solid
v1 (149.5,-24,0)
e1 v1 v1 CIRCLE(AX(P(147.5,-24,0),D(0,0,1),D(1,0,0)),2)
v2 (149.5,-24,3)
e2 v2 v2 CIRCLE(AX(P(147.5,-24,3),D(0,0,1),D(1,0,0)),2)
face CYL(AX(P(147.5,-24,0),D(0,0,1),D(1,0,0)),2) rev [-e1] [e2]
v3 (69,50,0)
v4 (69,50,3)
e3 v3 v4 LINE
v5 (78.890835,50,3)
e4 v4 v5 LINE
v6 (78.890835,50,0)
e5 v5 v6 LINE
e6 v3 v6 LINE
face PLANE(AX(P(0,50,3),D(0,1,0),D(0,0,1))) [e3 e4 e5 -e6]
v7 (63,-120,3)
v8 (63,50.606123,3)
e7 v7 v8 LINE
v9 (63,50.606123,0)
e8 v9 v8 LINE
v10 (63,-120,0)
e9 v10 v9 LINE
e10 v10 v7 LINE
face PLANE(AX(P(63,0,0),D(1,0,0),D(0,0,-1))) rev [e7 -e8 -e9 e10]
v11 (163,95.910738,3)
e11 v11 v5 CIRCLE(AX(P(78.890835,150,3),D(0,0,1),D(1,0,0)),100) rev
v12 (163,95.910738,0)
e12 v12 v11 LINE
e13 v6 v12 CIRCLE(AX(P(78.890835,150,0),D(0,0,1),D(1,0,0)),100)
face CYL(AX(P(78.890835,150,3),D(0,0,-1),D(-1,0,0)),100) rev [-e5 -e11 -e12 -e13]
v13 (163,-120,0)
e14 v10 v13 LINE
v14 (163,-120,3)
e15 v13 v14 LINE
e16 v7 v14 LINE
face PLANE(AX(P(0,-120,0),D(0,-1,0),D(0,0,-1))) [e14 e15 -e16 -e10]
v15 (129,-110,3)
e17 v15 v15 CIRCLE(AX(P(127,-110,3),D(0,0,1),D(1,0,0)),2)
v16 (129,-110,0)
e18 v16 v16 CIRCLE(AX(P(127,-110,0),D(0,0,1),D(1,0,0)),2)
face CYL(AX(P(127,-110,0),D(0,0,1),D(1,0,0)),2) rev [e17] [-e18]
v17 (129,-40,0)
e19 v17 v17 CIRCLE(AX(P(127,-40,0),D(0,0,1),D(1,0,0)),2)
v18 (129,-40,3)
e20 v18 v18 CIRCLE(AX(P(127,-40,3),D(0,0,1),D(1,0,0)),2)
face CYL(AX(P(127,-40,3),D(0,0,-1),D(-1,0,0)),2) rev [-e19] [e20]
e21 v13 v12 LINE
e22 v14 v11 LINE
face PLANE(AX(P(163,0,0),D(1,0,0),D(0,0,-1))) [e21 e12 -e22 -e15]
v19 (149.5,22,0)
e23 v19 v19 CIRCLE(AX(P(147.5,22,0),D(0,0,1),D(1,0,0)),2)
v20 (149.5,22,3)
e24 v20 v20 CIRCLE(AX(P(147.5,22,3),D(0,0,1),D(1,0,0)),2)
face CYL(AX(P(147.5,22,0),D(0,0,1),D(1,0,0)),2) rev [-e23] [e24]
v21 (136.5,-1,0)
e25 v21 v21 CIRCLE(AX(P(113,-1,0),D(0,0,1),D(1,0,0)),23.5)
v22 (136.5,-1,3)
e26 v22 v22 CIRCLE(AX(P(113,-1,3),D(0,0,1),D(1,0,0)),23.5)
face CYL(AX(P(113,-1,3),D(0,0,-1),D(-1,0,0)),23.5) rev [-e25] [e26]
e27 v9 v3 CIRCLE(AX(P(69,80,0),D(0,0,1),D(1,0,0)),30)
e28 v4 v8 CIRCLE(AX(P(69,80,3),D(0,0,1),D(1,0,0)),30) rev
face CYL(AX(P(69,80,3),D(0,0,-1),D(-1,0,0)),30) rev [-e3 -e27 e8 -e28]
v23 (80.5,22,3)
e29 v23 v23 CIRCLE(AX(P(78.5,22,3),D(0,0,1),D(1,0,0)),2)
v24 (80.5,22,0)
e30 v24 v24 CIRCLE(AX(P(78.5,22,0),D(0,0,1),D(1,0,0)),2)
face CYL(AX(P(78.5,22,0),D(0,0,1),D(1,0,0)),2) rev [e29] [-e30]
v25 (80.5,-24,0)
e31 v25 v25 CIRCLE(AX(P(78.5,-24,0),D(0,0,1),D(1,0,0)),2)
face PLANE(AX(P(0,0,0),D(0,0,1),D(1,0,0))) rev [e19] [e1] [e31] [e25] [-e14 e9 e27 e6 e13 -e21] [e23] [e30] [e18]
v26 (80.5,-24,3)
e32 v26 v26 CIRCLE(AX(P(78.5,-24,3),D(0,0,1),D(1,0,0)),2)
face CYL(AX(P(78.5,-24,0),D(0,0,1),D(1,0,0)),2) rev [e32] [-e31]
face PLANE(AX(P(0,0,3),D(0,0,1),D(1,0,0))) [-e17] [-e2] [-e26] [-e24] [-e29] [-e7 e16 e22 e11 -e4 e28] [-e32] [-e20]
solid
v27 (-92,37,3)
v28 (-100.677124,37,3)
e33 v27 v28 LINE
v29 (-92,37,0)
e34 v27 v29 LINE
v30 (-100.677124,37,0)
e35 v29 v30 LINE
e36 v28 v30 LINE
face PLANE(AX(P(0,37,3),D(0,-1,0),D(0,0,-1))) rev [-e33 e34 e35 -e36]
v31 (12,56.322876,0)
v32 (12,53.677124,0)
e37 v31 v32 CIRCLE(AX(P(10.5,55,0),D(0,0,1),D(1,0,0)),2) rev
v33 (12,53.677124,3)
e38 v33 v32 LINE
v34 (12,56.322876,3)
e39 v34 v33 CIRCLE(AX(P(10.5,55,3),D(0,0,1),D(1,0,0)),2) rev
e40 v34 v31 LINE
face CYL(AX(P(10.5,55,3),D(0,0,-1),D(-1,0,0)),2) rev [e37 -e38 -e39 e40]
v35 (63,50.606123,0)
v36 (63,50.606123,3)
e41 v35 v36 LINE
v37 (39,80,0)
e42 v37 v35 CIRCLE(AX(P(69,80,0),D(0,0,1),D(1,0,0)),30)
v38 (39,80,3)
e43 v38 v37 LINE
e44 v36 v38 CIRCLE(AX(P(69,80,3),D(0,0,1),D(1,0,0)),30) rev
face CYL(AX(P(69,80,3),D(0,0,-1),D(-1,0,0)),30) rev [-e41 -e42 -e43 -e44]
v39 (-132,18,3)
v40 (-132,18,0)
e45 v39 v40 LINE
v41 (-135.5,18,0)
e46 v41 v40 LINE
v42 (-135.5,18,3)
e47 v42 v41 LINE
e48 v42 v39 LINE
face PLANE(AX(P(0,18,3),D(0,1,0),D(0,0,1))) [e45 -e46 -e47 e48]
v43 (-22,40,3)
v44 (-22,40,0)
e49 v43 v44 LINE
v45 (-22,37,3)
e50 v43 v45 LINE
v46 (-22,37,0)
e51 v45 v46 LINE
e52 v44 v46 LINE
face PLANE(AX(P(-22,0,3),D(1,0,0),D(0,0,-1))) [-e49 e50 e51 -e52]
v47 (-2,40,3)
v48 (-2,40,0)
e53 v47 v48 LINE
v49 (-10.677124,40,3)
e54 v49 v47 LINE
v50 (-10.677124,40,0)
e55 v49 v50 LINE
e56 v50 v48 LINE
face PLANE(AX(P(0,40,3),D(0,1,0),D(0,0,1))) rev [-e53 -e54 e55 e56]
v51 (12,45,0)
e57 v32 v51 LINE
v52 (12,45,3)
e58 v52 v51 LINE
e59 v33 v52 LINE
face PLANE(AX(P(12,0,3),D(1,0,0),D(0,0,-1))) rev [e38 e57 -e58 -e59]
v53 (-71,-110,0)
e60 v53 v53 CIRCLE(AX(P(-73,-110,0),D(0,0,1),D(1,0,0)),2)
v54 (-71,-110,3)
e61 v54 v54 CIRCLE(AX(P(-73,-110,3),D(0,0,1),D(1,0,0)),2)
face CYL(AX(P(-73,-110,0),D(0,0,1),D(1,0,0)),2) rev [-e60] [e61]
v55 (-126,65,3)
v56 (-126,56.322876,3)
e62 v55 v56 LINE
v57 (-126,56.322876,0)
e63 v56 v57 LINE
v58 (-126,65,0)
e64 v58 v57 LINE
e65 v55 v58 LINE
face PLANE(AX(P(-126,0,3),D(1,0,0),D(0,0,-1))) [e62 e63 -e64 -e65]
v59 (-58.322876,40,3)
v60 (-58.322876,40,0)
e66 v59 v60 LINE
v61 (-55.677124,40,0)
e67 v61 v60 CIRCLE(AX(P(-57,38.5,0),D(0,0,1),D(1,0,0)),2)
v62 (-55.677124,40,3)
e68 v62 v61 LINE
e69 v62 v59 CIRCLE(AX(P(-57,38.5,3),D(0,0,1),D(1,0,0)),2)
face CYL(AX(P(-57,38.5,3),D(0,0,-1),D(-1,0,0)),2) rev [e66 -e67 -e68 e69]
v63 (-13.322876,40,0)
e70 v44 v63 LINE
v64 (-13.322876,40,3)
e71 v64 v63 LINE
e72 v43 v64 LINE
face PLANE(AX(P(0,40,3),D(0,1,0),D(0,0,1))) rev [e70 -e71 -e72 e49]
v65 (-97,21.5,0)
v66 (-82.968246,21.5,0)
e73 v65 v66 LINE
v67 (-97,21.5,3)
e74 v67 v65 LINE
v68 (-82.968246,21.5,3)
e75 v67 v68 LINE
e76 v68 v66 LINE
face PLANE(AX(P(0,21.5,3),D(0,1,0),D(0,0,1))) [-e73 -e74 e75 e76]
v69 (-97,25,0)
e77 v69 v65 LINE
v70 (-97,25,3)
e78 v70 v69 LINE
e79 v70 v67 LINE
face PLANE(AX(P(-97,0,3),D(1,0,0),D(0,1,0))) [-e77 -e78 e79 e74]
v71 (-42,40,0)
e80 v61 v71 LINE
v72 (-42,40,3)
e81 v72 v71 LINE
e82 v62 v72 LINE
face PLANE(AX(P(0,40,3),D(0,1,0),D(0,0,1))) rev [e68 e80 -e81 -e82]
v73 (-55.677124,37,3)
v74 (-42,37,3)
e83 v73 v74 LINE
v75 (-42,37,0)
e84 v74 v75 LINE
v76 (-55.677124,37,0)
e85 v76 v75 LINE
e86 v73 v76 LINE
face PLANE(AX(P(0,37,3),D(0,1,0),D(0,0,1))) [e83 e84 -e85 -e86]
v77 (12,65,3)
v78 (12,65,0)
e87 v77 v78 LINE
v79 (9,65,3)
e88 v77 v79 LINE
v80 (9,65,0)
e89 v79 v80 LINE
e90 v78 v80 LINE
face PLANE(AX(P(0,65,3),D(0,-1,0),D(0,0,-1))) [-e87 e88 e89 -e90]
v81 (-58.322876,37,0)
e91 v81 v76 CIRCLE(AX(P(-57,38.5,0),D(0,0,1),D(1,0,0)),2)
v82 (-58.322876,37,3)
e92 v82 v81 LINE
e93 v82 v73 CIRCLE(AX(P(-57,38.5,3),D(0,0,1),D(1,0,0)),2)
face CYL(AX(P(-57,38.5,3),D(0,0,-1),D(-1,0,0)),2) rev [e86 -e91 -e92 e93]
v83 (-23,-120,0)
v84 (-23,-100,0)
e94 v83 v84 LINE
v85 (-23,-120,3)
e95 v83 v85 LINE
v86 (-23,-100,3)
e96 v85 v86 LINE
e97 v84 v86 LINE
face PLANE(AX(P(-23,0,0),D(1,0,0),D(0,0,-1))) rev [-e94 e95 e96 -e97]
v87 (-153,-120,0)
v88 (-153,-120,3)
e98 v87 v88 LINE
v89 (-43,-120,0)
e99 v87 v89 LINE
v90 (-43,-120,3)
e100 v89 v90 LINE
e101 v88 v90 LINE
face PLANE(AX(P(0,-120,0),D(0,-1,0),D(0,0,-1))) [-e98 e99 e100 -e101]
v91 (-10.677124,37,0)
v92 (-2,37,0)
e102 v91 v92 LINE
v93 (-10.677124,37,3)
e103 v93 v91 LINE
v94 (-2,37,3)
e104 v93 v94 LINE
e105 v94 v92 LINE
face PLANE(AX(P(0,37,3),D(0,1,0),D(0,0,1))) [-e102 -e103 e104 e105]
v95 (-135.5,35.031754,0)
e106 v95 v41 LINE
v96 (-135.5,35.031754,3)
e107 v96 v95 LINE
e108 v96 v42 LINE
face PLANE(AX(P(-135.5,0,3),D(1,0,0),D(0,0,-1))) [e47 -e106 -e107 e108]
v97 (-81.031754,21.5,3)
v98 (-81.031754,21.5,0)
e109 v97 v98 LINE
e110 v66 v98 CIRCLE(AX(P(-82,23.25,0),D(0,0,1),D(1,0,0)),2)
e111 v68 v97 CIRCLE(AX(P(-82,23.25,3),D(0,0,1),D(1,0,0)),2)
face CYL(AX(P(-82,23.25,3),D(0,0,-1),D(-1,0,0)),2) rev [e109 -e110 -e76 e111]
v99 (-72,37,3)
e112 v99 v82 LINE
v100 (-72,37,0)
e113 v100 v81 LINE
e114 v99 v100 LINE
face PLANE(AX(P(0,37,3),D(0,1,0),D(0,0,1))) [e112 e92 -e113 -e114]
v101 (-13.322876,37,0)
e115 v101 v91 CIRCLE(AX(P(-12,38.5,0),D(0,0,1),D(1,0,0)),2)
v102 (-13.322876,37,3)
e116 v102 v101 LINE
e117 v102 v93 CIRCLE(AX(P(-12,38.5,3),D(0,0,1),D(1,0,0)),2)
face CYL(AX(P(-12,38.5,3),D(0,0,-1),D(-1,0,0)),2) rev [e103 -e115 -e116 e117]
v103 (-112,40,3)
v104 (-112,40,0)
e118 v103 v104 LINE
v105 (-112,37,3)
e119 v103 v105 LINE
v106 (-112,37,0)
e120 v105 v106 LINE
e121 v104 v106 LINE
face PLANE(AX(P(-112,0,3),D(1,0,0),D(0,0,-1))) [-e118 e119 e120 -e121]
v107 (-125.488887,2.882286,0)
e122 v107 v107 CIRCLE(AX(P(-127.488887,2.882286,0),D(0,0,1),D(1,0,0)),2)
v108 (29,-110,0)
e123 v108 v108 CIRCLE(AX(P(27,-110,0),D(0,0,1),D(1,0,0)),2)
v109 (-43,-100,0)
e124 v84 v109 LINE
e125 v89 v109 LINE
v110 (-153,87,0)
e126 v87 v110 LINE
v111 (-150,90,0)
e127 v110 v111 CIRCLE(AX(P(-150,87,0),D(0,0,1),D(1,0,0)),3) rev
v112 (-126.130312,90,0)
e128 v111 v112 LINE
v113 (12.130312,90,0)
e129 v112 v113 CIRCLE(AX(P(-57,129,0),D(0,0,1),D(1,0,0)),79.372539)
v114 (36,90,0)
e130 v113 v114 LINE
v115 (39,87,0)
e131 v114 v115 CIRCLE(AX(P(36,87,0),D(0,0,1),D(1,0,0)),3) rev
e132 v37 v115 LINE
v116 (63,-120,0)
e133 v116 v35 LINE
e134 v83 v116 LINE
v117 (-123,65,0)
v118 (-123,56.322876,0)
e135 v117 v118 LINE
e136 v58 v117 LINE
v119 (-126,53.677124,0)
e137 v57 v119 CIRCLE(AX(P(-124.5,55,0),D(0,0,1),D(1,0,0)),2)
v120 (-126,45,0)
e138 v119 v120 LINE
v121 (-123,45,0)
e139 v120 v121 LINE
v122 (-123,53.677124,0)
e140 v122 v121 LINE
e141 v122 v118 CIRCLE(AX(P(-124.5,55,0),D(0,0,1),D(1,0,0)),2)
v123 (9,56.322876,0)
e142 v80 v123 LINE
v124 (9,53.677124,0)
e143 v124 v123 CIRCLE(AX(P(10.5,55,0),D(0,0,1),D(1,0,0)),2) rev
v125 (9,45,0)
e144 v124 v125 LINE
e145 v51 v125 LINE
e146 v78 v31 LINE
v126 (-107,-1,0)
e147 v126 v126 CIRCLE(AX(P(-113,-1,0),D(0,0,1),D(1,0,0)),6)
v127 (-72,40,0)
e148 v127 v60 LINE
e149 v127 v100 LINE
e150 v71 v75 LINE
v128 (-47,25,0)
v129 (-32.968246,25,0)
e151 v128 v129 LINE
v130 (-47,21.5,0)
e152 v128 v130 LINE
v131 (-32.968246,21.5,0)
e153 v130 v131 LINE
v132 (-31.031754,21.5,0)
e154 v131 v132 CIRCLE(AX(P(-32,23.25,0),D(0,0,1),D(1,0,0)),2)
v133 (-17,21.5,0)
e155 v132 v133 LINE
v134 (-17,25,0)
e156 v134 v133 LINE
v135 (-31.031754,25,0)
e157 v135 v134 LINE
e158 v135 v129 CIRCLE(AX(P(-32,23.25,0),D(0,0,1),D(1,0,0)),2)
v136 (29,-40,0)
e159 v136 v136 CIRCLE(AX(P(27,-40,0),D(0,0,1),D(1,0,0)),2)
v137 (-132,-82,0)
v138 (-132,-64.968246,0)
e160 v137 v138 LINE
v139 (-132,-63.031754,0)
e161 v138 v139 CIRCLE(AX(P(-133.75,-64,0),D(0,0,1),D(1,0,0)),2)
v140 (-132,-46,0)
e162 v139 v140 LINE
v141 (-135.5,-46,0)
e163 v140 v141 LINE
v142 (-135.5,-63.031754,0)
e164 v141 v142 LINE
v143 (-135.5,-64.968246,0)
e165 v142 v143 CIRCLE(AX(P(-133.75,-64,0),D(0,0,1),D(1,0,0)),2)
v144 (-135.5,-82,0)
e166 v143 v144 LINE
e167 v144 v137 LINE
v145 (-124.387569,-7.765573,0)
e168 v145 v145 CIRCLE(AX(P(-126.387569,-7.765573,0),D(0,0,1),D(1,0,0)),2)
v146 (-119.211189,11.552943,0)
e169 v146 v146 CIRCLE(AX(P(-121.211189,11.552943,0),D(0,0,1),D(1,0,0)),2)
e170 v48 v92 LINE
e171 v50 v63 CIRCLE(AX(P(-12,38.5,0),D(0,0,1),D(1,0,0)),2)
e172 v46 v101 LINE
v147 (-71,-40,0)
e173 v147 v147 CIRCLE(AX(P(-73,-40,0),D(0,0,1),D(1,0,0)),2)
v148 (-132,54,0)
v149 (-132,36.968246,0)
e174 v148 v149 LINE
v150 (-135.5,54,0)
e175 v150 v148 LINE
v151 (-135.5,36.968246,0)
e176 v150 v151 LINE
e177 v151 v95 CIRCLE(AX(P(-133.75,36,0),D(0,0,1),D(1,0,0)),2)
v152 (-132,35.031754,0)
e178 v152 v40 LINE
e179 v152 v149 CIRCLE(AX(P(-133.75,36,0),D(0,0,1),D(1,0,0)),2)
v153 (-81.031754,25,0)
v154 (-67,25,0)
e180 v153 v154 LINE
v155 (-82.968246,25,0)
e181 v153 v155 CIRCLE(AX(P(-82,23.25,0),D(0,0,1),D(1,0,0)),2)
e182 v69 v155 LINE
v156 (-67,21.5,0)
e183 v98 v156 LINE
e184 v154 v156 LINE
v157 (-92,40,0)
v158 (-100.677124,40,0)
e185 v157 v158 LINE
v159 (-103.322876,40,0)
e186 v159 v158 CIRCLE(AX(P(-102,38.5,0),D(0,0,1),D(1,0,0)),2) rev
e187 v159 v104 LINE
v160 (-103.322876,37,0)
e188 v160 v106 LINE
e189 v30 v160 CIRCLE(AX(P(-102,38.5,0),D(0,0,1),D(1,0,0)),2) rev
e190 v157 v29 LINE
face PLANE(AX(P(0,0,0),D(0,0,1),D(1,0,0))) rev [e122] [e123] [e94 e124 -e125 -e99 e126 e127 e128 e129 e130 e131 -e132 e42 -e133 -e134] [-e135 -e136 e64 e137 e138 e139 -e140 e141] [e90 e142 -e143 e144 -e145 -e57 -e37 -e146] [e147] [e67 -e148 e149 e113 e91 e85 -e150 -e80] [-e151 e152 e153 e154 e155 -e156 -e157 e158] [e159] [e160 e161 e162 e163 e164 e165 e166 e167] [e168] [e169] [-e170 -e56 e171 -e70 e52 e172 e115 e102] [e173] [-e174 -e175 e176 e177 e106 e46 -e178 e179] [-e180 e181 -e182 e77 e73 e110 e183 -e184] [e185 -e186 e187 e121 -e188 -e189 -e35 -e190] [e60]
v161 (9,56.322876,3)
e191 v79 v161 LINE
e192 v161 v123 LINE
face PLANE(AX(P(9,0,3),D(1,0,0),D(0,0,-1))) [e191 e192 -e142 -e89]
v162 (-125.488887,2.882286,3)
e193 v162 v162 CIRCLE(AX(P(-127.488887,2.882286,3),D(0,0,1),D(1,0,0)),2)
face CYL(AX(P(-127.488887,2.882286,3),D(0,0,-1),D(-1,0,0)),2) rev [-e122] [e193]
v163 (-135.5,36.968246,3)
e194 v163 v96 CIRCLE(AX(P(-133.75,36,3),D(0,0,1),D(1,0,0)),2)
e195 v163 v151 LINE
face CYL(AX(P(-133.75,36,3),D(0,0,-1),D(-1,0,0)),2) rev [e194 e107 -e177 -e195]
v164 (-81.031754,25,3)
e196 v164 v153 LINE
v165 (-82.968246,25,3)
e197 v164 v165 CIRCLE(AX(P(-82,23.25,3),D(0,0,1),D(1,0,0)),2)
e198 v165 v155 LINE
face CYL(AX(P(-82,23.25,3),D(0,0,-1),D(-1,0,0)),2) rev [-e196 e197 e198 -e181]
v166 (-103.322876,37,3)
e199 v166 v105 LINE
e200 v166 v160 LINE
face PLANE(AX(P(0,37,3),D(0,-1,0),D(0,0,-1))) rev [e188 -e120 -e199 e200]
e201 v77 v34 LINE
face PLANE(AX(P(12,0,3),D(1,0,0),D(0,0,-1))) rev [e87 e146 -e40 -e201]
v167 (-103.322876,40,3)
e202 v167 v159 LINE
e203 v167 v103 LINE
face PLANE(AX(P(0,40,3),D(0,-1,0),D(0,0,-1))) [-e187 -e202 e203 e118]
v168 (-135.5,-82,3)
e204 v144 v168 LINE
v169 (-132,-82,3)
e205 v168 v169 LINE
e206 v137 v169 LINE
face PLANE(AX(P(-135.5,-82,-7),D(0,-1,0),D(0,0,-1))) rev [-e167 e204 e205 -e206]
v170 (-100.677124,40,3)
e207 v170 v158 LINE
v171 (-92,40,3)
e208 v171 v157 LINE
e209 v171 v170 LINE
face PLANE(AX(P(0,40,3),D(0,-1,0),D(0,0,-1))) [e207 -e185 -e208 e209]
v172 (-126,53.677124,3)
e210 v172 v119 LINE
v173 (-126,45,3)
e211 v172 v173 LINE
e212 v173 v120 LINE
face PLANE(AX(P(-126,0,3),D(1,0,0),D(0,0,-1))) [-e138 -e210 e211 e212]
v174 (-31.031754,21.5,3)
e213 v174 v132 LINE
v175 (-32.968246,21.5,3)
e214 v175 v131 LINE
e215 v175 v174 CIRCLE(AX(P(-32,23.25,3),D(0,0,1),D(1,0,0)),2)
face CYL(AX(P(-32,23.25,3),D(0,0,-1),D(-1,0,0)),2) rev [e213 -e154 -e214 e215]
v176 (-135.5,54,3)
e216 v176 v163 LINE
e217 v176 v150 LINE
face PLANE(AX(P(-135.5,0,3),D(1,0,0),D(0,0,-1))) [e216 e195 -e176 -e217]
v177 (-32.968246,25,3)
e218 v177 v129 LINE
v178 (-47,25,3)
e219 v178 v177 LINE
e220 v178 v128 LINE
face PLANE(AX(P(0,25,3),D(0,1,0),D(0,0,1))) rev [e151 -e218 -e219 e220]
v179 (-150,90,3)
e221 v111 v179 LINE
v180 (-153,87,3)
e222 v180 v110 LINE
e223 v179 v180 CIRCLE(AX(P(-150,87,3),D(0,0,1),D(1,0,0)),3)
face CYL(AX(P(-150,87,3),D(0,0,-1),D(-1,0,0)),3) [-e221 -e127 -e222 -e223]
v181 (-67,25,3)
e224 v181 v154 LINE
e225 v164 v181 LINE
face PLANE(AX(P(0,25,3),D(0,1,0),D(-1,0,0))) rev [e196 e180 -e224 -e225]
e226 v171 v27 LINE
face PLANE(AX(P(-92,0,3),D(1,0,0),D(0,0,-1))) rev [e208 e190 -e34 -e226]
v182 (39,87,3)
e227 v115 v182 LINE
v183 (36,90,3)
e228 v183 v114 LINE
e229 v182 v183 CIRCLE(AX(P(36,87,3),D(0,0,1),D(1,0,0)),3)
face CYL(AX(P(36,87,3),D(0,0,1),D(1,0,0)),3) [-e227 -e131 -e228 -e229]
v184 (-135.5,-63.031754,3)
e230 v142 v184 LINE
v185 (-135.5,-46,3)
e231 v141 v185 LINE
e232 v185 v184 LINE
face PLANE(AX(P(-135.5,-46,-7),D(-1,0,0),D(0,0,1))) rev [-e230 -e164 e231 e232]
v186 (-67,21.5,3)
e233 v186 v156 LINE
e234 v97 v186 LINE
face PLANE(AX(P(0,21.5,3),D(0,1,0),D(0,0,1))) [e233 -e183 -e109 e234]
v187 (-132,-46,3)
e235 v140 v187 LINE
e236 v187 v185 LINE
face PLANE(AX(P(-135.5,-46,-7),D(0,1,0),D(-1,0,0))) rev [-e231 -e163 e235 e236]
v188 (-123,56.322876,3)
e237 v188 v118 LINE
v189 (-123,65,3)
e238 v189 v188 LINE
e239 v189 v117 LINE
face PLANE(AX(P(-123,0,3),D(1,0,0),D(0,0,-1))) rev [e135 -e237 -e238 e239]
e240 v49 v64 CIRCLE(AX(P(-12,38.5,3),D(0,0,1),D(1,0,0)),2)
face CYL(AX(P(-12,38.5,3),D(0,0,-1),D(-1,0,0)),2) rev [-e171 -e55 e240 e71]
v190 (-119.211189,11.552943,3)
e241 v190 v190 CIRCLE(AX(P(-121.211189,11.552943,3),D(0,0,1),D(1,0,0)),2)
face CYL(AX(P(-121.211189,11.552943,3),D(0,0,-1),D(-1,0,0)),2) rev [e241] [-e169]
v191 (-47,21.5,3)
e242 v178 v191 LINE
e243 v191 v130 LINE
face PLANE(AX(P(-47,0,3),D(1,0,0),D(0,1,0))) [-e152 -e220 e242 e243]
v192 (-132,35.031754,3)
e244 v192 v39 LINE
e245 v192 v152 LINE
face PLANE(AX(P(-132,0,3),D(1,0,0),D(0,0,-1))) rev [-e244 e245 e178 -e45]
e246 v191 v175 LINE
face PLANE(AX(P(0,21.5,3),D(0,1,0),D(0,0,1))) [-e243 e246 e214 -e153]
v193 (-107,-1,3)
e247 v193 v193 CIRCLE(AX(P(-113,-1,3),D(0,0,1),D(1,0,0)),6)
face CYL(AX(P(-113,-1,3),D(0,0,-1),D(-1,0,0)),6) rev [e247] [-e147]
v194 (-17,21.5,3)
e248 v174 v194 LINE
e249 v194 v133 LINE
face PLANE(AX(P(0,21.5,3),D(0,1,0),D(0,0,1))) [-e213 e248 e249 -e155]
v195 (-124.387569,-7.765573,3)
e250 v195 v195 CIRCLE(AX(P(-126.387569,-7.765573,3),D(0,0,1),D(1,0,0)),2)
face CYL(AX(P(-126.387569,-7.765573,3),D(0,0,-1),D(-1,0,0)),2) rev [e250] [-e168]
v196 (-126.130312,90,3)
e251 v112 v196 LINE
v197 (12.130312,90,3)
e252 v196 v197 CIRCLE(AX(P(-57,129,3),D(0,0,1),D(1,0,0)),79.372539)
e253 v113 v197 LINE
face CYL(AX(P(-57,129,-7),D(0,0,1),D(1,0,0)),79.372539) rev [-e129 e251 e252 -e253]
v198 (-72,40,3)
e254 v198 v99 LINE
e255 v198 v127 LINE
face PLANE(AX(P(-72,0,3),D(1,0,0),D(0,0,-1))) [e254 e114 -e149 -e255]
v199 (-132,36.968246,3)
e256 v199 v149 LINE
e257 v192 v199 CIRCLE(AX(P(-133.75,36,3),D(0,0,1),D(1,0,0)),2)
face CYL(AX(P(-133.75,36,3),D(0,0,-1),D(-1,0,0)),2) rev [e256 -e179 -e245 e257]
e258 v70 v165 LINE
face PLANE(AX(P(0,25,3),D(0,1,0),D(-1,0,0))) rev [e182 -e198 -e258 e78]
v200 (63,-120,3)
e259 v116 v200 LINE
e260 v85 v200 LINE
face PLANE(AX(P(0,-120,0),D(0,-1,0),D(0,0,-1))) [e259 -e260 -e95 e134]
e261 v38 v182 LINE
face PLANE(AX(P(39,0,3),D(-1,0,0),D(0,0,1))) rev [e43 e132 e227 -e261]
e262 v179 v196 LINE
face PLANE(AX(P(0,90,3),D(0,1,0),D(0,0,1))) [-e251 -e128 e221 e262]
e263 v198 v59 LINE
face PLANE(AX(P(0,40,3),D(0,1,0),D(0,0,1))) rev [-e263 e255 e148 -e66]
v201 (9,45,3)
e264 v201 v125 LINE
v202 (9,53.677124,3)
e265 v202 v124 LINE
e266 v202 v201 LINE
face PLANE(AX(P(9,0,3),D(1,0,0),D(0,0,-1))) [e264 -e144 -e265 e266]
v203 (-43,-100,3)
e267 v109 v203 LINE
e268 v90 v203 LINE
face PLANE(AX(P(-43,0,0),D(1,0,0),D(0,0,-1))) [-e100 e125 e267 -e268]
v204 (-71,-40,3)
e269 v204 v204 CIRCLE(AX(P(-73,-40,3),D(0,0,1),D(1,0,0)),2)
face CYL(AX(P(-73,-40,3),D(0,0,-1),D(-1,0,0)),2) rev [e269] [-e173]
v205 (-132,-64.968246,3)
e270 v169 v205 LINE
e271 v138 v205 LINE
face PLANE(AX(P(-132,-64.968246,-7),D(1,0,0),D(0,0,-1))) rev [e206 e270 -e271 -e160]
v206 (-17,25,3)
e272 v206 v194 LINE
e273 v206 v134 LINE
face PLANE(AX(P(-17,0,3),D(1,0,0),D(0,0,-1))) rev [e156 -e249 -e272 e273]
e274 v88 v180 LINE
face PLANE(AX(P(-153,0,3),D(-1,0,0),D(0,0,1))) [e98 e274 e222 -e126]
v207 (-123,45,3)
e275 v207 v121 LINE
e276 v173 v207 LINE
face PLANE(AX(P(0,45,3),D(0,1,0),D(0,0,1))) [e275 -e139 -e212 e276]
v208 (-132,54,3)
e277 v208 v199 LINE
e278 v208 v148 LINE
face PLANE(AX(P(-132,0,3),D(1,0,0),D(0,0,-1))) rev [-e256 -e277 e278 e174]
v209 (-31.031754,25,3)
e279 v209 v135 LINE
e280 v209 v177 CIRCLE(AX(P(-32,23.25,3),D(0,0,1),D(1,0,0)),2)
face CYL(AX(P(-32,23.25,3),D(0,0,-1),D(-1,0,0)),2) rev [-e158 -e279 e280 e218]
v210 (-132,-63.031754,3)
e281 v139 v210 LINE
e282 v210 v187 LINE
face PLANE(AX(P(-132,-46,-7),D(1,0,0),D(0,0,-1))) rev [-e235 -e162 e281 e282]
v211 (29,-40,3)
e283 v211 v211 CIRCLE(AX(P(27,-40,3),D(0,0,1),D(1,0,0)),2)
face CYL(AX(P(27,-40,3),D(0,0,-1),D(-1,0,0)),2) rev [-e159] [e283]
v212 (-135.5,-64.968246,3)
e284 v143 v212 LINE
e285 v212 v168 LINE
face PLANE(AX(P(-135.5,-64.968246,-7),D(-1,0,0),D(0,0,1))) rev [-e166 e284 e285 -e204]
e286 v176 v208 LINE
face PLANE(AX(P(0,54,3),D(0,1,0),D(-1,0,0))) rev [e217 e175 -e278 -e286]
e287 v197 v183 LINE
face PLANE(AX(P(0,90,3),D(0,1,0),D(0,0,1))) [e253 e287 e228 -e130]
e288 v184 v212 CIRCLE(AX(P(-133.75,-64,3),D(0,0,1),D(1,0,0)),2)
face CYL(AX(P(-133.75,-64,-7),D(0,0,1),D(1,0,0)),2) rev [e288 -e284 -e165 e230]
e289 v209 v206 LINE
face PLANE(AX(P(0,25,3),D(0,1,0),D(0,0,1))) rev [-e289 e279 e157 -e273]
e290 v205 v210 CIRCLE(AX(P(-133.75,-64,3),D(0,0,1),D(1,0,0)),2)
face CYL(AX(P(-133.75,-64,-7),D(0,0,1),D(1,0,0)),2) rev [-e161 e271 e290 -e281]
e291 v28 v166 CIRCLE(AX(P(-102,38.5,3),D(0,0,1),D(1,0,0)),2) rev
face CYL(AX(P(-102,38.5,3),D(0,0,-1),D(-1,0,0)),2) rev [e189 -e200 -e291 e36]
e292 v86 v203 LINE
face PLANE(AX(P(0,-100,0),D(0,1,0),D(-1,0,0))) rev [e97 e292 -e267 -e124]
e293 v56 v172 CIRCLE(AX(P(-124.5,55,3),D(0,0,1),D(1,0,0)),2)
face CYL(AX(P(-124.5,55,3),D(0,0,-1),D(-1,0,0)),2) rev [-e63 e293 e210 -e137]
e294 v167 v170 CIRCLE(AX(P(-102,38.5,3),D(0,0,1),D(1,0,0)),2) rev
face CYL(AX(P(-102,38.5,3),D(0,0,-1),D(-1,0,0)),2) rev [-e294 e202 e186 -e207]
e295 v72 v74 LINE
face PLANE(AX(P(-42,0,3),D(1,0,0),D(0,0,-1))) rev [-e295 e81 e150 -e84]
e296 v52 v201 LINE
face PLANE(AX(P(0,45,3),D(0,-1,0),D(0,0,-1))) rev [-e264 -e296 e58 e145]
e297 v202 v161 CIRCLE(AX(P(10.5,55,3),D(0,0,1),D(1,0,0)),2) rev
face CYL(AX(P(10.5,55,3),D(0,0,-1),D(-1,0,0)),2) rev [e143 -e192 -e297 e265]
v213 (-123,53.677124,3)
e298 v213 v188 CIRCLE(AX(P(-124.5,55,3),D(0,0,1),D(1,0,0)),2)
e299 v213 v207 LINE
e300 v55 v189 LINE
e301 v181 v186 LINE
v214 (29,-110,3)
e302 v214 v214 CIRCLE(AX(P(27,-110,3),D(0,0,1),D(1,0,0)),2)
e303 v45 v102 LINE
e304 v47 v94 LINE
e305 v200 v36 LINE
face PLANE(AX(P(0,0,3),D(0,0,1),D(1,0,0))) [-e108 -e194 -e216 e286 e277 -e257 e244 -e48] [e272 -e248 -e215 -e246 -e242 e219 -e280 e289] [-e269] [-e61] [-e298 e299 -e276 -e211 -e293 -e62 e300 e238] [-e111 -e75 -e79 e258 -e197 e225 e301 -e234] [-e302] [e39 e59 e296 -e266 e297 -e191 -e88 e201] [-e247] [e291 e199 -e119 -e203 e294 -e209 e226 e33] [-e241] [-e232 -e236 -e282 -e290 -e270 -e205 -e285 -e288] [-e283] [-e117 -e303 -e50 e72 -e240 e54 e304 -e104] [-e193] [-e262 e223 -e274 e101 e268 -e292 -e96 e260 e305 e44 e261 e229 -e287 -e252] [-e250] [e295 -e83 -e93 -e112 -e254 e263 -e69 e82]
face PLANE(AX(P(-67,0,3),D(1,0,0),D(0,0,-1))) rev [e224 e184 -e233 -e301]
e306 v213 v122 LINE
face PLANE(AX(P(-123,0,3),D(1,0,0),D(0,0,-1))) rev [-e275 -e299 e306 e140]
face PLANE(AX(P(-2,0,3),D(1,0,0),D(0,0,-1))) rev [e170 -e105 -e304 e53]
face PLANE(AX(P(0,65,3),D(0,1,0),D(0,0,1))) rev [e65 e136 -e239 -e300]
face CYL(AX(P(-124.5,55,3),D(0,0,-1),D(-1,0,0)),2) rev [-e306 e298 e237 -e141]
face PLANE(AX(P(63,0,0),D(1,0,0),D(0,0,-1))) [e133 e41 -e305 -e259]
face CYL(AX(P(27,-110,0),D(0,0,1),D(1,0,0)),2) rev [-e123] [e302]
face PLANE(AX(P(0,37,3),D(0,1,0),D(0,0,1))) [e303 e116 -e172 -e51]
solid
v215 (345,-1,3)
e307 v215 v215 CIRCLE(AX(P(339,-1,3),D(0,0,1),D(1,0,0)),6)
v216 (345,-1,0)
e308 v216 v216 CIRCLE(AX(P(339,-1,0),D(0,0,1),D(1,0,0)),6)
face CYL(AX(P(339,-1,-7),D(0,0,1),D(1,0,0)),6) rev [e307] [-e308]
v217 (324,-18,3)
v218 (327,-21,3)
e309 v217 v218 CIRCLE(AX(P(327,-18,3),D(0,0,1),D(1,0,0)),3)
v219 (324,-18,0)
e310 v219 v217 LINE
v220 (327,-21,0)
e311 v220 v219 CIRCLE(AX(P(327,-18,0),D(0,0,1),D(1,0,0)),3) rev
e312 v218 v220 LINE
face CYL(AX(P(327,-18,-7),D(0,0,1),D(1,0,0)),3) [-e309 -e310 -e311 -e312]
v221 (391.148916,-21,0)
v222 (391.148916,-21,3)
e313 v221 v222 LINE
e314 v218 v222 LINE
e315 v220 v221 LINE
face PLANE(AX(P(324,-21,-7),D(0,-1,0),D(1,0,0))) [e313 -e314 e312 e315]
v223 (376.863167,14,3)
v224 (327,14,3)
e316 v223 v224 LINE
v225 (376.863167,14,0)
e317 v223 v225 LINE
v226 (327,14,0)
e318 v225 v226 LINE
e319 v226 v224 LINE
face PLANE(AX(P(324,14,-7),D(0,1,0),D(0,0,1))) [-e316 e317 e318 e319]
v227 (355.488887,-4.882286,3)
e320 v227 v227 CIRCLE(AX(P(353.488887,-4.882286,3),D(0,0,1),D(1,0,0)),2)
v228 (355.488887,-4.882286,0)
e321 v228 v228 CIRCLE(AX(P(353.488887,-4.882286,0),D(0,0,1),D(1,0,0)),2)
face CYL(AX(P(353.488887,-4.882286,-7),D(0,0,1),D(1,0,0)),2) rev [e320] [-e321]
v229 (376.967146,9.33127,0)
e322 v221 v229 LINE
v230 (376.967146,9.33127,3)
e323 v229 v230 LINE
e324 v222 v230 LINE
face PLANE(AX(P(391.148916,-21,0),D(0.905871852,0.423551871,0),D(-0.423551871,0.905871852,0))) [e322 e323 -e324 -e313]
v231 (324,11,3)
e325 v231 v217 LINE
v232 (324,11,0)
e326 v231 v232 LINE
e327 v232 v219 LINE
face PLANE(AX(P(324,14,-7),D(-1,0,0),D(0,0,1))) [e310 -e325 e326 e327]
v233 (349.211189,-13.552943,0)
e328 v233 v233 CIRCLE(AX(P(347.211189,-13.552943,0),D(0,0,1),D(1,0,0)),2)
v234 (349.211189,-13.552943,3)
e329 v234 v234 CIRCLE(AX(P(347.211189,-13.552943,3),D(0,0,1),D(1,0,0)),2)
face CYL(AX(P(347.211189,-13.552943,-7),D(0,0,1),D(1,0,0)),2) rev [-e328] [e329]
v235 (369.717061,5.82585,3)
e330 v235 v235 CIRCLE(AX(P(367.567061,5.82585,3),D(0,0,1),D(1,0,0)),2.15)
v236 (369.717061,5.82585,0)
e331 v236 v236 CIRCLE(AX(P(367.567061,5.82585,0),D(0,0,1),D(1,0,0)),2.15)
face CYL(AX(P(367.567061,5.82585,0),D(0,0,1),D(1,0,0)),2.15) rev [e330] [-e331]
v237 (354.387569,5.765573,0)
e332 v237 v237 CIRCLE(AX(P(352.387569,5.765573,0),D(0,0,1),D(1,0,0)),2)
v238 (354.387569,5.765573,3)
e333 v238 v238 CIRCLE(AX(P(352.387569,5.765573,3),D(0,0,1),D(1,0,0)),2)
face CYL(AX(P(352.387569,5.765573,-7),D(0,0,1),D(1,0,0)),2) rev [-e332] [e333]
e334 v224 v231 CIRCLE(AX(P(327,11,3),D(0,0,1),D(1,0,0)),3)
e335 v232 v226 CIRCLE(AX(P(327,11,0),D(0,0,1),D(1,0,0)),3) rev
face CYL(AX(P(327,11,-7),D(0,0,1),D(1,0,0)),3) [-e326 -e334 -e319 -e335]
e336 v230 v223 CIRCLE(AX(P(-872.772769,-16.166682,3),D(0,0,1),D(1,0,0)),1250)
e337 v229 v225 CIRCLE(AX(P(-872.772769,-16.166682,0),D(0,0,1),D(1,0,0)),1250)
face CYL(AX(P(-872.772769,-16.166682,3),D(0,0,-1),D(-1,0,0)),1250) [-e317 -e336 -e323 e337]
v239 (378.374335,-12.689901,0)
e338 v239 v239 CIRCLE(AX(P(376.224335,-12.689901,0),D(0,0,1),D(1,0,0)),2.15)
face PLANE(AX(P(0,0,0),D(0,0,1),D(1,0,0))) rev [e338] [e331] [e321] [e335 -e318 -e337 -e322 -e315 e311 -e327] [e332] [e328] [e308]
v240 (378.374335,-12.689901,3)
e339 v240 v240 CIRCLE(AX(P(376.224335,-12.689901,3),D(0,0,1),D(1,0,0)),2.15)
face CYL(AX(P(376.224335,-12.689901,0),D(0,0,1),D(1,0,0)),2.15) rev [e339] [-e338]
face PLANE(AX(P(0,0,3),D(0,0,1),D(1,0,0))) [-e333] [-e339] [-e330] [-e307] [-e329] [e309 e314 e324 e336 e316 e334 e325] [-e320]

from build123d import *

# Parameters (mm, degrees)
SKETCH_1_R                   = 2
SKETCH_1_R_2                 = 6
SKETCH_1_R_3                 = 23.5
EXTRUDE_1_DEPTH              = 3
FILLET_1_R                   = 100
FILLET_2_R                   = 3
CUT_EXTRUDE_1_DEPTH          = 10
FILLET_3_R                   = 30
SKETCH_8_R                   = 2
EXTRUDE_5_DEPTH              = 3
SKETCH_7_R                   = 2
CUT_EXTRUDE_6_DEPTH          = 627.829093668
CUT_EXTRUDE_START            = -10
CUT_EXTRUDE_7_DEPTH          = 10
SPLIT_START                  = 63
SPLIT_BODIES_1_OUTLINE_W     = 622
SPLIT_BODIES_1_OUTLINE_H     = 3
SPLIT_BODIES_1_DEPTH         = 314.227231476
SPLIT_BODIES_1_2_OUTLINE_R   = 2
SPLIT_BODIES_1_2_DEPTH       = 3
SPLIT_BODIES_1_3_OUTLINE_R   = 2
SPLIT_BODIES_1_3_OUTLINE_R_2 = 23.5
SPLIT_BODIES_1_3_DEPTH       = 3
SKETCH_11_W                  = 23
SKETCH_11_H                  = 23
CUT_EXTRUDE_8_DEPTH          = 10
SKETCH_12_R                  = 5.999999999
SKETCH_12_R_2                = 1.999999999
CUT_EXTRUDE_9_DEPTH          = 10
SKETCH_13_R                  = 2
CUT_EXTRUDE_10_DEPTH         = 10
SKETCH_14_R                  = 2
CUT_EXTRUDE_11_DEPTH         = 10
SKETCH_15_OUTSIDE_W          = 695.481
SKETCH_15_OUTSIDE_H          = 785.859
SKETCH_15_OUTSIDE_W_2        = 88.236351933
SKETCH_15_OUTSIDE_H_2        = 35
CUT_EXTRUDE_12_DEPTH         = 10
EXTRUDE_6_DEPTH              = 3
FILLET_4_R                   = 3
SKETCH_17_R                  = 2.15
CUT_EXTRUDE_13_DEPTH         = 3


# Read off the part's stored shape, not the designer's step: 分割1
with BuildPart() as part:
    # 草图1 → 凸台-拉伸1 (new body)
    with BuildSketch(Plane.XY):
        with BuildLine():
            Line((-153, 90), (-153, -50))
            Line((-153, -50), (-43, -50))
            Line((-43, -50), (-43, -30))
            Line((-43, -30), (-23, -30))
            Line((-23, -30), (-23, -50))
            Line((-23, -50), (186, -50))
            Line((186, -50), (186, -27))
            Line((186, -27), (208, -27))
            Line((208, -27), (208, -50))
            Line((208, -50), (377, -50))
            Line((377, -50), (377, -40))
            ThreePointArc((377, -40), (351.416576428, 236.539566066), (265.404312441, 500.604962521))
            Line((265.404312441, 500.604962521), (265.404312441, 285))
            Line((265.404312441, 285), (162.933559346, 285))
            ThreePointArc((162.933559346, 285), (177.824282666, 167.941273759), (181.610438264, 50))
            Line((181.610438264, 50), (39, 50))
            Line((39, 50), (39, 90))
            Line((39, 90), (-153, 90))
        make_face()
        with Locations((-126.387569495, -7.765573369)):
            Circle(SKETCH_1_R, mode=Mode.SUBTRACT)
        with Locations((-127.488887394, 2.882285677)):
            Circle(SKETCH_1_R, mode=Mode.SUBTRACT)
        with Locations((-113, -1)):
            Circle(SKETCH_1_R_2, mode=Mode.SUBTRACT)
        with Locations((-73, -40)):
            Circle(SKETCH_1_R, mode=Mode.SUBTRACT)
        with Locations((-121.211188593, 11.552943156)):
            Circle(SKETCH_1_R, mode=Mode.SUBTRACT)
        with BuildLine():
            Line((-135.5, 36.968245837), (-135.5, 54))
            Line((-135.5, 54), (-132, 54))
            Line((-132, 54), (-132, 36.968245837))
            ThreePointArc((-132, 36.968245837), (-131.75, 36), (-132, 35.031754163))
            Line((-132, 35.031754163), (-132, 18))
            Line((-132, 18), (-135.5, 18))
            Line((-135.5, 18), (-135.5, 35.031754163))
            ThreePointArc((-135.5, 35.031754163), (-135.75, 36), (-135.5, 36.968245837))
        make_face(mode=Mode.SUBTRACT)
        with BuildLine():
            Line((-92, 40), (-92, 37))
            Line((-92, 37), (-100.677124344, 37))
            ThreePointArc((-100.677124344, 37), (-102, 36.5), (-103.322875656, 37))
            Line((-103.322875656, 37), (-112, 37))
            Line((-112, 37), (-112, 40))
            Line((-112, 40), (-103.322875656, 40))
            ThreePointArc((-103.322875656, 40), (-102, 40.5), (-100.677124344, 40))
            Line((-100.677124344, 40), (-92, 40))
        make_face(mode=Mode.SUBTRACT)
        with BuildLine():
            Line((-126, 56.322875656), (-126, 65))
            Line((-126, 65), (-123, 65))
            Line((-123, 65), (-123, 56.322875656))
            ThreePointArc((-123, 56.322875656), (-122.5, 55), (-123, 53.677124344))
            Line((-123, 53.677124344), (-123, 45))
            Line((-123, 45), (-126, 45))
            Line((-126, 45), (-126, 53.677124344))
            ThreePointArc((-126, 53.677124344), (-126.5, 55), (-126, 56.322875656))
        make_face(mode=Mode.SUBTRACT)
        with BuildLine():
            Line((-97, 21.5), (-97, 25))
            Line((-97, 25), (-82.968245837, 25))
            ThreePointArc((-82.968245837, 25), (-82, 25.25), (-81.031754163, 25))
            Line((-81.031754163, 25), (-67, 25))
            Line((-67, 25), (-67, 21.5))
            Line((-67, 21.5), (-81.031754163, 21.5))
            ThreePointArc((-81.031754163, 21.5), (-82, 21.25), (-82.968245837, 21.5))
            Line((-82.968245837, 21.5), (-97, 21.5))
        make_face(mode=Mode.SUBTRACT)
        with BuildLine():
            Line((-72, 37), (-72, 40))
            Line((-72, 40), (-58.322875656, 40))
            ThreePointArc((-58.322875656, 40), (-57, 40.5), (-55.677124344, 40))
            Line((-55.677124344, 40), (-42, 40))
            Line((-42, 40), (-42, 37))
            Line((-42, 37), (-55.677124344, 37))
            ThreePointArc((-55.677124344, 37), (-57, 36.5), (-58.322875656, 37))
            Line((-58.322875656, 37), (-72, 37))
        make_face(mode=Mode.SUBTRACT)
        with BuildLine():
            Line((-47, 21.5), (-47, 25))
            Line((-47, 25), (-32.968245837, 25))
            ThreePointArc((-32.968245837, 25), (-32, 25.25), (-31.031754163, 25))
            Line((-31.031754163, 25), (-17, 25))
            Line((-17, 25), (-17, 21.5))
            Line((-17, 21.5), (-31.031754163, 21.5))
            ThreePointArc((-31.031754163, 21.5), (-32, 21.25), (-32.968245837, 21.5))
            Line((-32.968245837, 21.5), (-47, 21.5))
        make_face(mode=Mode.SUBTRACT)
        with Locations((27, -40)):
            Circle(SKETCH_1_R, mode=Mode.SUBTRACT)
        with BuildLine():
            Line((-22, 37), (-22, 40))
            Line((-22, 40), (-13.322875656, 40))
            ThreePointArc((-13.322875656, 40), (-12, 40.5), (-10.677124344, 40))
            Line((-10.677124344, 40), (-2, 40))
            Line((-2, 40), (-2, 37))
            Line((-2, 37), (-10.677124344, 37))
            ThreePointArc((-10.677124344, 37), (-12, 36.5), (-13.322875656, 37))
            Line((-13.322875656, 37), (-22, 37))
        make_face(mode=Mode.SUBTRACT)
        with BuildLine():
            Line((12, 53.677124344), (12, 45))
            Line((12, 45), (9, 45))
            Line((9, 45), (9, 53.677124344))
            ThreePointArc((9, 53.677124344), (8.5, 55), (9, 56.322875656))
            Line((9, 56.322875656), (9, 65))
            Line((9, 65), (12, 65))
            Line((12, 65), (12, 56.322875656))
            ThreePointArc((12, 56.322875656), (12.5, 55), (12, 53.677124344))
        make_face(mode=Mode.SUBTRACT)
        with Locations((127, -40)):
            Circle(SKETCH_1_R, mode=Mode.SUBTRACT)
        with Locations((113, -1)):
            Circle(SKETCH_1_R_3, mode=Mode.SUBTRACT)
        with Locations((227, -40)):
            Circle(SKETCH_1_R, mode=Mode.SUBTRACT)
        with Locations((197, 36.410161514)):
            Circle(SKETCH_1_R, mode=Mode.SUBTRACT)
        with Locations((197, 76.410161514)):
            Circle(SKETCH_1_R, mode=Mode.SUBTRACT)
        with Locations((277, -40)):
            Circle(SKETCH_1_R, mode=Mode.SUBTRACT)
        with Locations((327, -40)):
            Circle(SKETCH_1_R, mode=Mode.SUBTRACT)
        with Locations((197, 116.410161514)):
            Circle(SKETCH_1_R, mode=Mode.SUBTRACT)
        with Locations((197, 156.410161514)):
            Circle(SKETCH_1_R, mode=Mode.SUBTRACT)
        with Locations((197, 196.410161514)):
            Circle(SKETCH_1_R, mode=Mode.SUBTRACT)
        with Locations((197, 236.410161514)):
            Circle(SKETCH_1_R, mode=Mode.SUBTRACT)
        with Locations((266.652617784, 221.656683726)):
            Circle(SKETCH_1_R, mode=Mode.SUBTRACT)
        with Locations((283.594692637, 185.421809645)):
            Circle(SKETCH_1_R, mode=Mode.SUBTRACT)
        with Locations((249.710542931, 257.891557807)):
            Circle(SKETCH_1_R, mode=Mode.SUBTRACT)
        with Locations((275.404312441, 415)):
            Circle(SKETCH_1_R, mode=Mode.SUBTRACT)
    extrude(amount=EXTRUDE_1_DEPTH)

    # 圆角1
    fillet_1_edges = [part.edges().sort_by_distance(p)[0] for p in [
        (181.610438264, 50, 1.5),
    ]]
    fillet(fillet_1_edges, radius=FILLET_1_R)

    # 圆角2
    fillet_2_edges = [part.edges().sort_by_distance(p)[0] for p in [
        (162.933559346, 285, 1.5),
        (-153, 90, 1.5),
        (39, 90, 1.5),
    ]]
    fillet(fillet_2_edges, radius=FILLET_2_R)

    # 草图3 → 切除-旋转1 (revolve, cut)
    with BuildSketch(Plane.XY.offset(93)):
        with BuildLine():
            Line((-57, 249), (-57, 9))
            ThreePointArc((-57, 9), (63, 129), (-57, 249))
        make_face()
    revolve(axis=Axis((-57, -897.264284178, 93), (0, 1, 0)), mode=Mode.SUBTRACT)

    # 草图4 → 切除-拉伸1 (cut)
    with BuildSketch(Plane.XY.offset(3)):
        with BuildLine():
            Line((12.130311731, 90), (8.038450166, 90))
            ThreePointArc((8.038450166, 90), (-57, 53.164652041), (-122.038450166, 90))
            Line((-122.038450166, 90), (-126.130311731, 90))
            ThreePointArc((-126.130311731, 90), (-57, 49.627460668), (12.130311731, 90))
        make_face()
    extrude(amount=-CUT_EXTRUDE_1_DEPTH, mode=Mode.SUBTRACT)

    # 圆角3
    fillet_3_edges = [part.edges().sort_by_distance(p)[0] for p in [
        (39, 50, 1.5),
    ]]
    fillet(fillet_3_edges, radius=FILLET_3_R)

    # 草图8 → 凸台-拉伸5 (add)
    with BuildSketch(Plane.XY.offset(3)):
        Polygon((-43, -50), (-153, -50), (-153, -120), (-43, -120), (-43, -100), (-23, -100), (-23, -120), (186, -120), (186, -97), (208, -97), (208, -120), (377, -120), (377, -50), (208, -50), (208, -27), (186, -27), (186, -50), (-23, -50), (-23, -30), (-43, -30), align=None)
        with Locations((-73, -110)):
            Circle(SKETCH_8_R, mode=Mode.SUBTRACT)
        with Locations((27, -110)):
            Circle(SKETCH_8_R, mode=Mode.SUBTRACT)
        with Locations((127, -110)):
            Circle(SKETCH_8_R, mode=Mode.SUBTRACT)
        with Locations((227, -110)):
            Circle(SKETCH_8_R, mode=Mode.SUBTRACT)
        with Locations((277, -110)):
            Circle(SKETCH_8_R, mode=Mode.SUBTRACT)
        with Locations((327, -110)):
            Circle(SKETCH_8_R, mode=Mode.SUBTRACT)
    extrude(amount=-EXTRUDE_5_DEPTH)

    # 草图7 → 切除-拉伸6 (cut, through all)
    with BuildSketch(Plane.XY.offset(3)):
        with Locations((78.5, 22)):
            Circle(SKETCH_7_R)
        with Locations((147.5, 22)):
            Circle(SKETCH_7_R)
        with Locations((147.5, -24)):
            Circle(SKETCH_7_R)
        with Locations((78.5, -24)):
            Circle(SKETCH_7_R)
    extrude(amount=-CUT_EXTRUDE_6_DEPTH, mode=Mode.SUBTRACT)

    # 草图9 → 切除-拉伸7 (cut)
    with BuildSketch(Plane.XY.offset(3).offset(CUT_EXTRUDE_START)):
        with BuildLine():
            Line((-135.5, 35.031754163), (-135.5, 18))
            Line((-135.5, 18), (-132, 18))
            Line((-132, 18), (-132, 35.031754163))
            ThreePointArc((-132, 35.031754163), (-131.75, 36), (-132, 36.968245837))
            Line((-132, 36.968245837), (-132, 54))
            Line((-132, 54), (-135.5, 54))
            Line((-135.5, 54), (-135.5, 36.968245837))
            ThreePointArc((-135.5, 36.968245837), (-135.75, 36), (-135.5, 35.031754163))
        make_face()
        with BuildLine():
            Line((-132, -46), (-132, -63.031754163))
            ThreePointArc((-132, -63.031754163), (-131.75, -64), (-132, -64.968245837))
            Line((-132, -64.968245837), (-132, -82))
            Line((-132, -82), (-135.5, -82))
            Line((-135.5, -82), (-135.5, -64.968245837))
            ThreePointArc((-135.5, -64.968245837), (-135.75, -64), (-135.5, -63.031754163))
            Line((-135.5, -63.031754163), (-135.5, -46))
            Line((-135.5, -46), (-132, -46))
        make_face()
    extrude(amount=CUT_EXTRUDE_7_DEPTH, mode=Mode.SUBTRACT)

    # Split Bodies 1 outline → Split Bodies 1 (cut)
    with BuildSketch(Plane.YZ.offset(SPLIT_START)):
        with Locations((191, 1.5)):
            Rectangle(SPLIT_BODIES_1_OUTLINE_W, SPLIT_BODIES_1_OUTLINE_H)
    extrude(amount=SPLIT_BODIES_1_DEPTH, mode=Mode.SUBTRACT)


with BuildPart() as body_2:
    # Split Bodies 1 2 outline → Split Bodies 1 2 (new body)
    with BuildSketch(Plane.XY):
        with BuildLine():
            Line((163, 95.910737705), (163, -120))
            Line((163, -120), (186, -120))
            Line((186, -120), (186, -97))
            Line((186, -97), (208, -97))
            Line((208, -97), (208, -120))
            Line((208, -120), (377, -120))
            Line((377, -120), (377, -40))
            ThreePointArc((377, -40), (351.416576428, 236.539566066), (265.404312441, 500.604962521))
            Line((265.404312441, 500.604962521), (265.404312441, 285))
            Line((265.404312441, 285), (166.500797038, 285))
            ThreePointArc((166.500797038, 285), (164.206174437, 283.932539034), (163.544498541, 281.489804745))
            ThreePointArc((163.544498541, 281.489804745), (172.654031933, 219.459988457), (178.641910806, 157.051439252))
            ThreePointArc((178.641910806, 157.051439252), (175.770623293, 125.214791859), (163, 95.910737705))
        make_face()
        with Locations((227, -110)):
            Circle(SPLIT_BODIES_1_2_OUTLINE_R, mode=Mode.SUBTRACT)
        with Locations((227, -40)):
            Circle(SPLIT_BODIES_1_2_OUTLINE_R, mode=Mode.SUBTRACT)
        with Locations((197, 36.410161514)):
            Circle(SPLIT_BODIES_1_2_OUTLINE_R, mode=Mode.SUBTRACT)
        with Locations((197, 76.410161514)):
            Circle(SPLIT_BODIES_1_2_OUTLINE_R, mode=Mode.SUBTRACT)
        with Locations((197, 116.410161514)):
            Circle(SPLIT_BODIES_1_2_OUTLINE_R, mode=Mode.SUBTRACT)
        with Locations((197, 156.410161514)):
            Circle(SPLIT_BODIES_1_2_OUTLINE_R, mode=Mode.SUBTRACT)
        with Locations((277, -110)):
            Circle(SPLIT_BODIES_1_2_OUTLINE_R, mode=Mode.SUBTRACT)
        with Locations((277, -40)):
            Circle(SPLIT_BODIES_1_2_OUTLINE_R, mode=Mode.SUBTRACT)
        with Locations((327, -110)):
            Circle(SPLIT_BODIES_1_2_OUTLINE_R, mode=Mode.SUBTRACT)
        with Locations((327, -40)):
            Circle(SPLIT_BODIES_1_2_OUTLINE_R, mode=Mode.SUBTRACT)
        with Locations((283.594692637, 185.421809645)):
            Circle(SPLIT_BODIES_1_2_OUTLINE_R, mode=Mode.SUBTRACT)
        with Locations((197, 196.410161514)):
            Circle(SPLIT_BODIES_1_2_OUTLINE_R, mode=Mode.SUBTRACT)
        with Locations((197, 236.410161514)):
            Circle(SPLIT_BODIES_1_2_OUTLINE_R, mode=Mode.SUBTRACT)
        with Locations((266.652617784, 221.656683726)):
            Circle(SPLIT_BODIES_1_2_OUTLINE_R, mode=Mode.SUBTRACT)
        with Locations((249.710542931, 257.891557807)):
            Circle(SPLIT_BODIES_1_2_OUTLINE_R, mode=Mode.SUBTRACT)
        with Locations((275.404312441, 415)):
            Circle(SPLIT_BODIES_1_2_OUTLINE_R, mode=Mode.SUBTRACT)
    extrude(amount=SPLIT_BODIES_1_2_DEPTH)

    # 草图11 → 切除-拉伸8 (cut)
    with BuildSketch(Plane.XY.offset(3)):
        with Locations((174.5, -108.5)):
            Rectangle(SKETCH_11_W, SKETCH_11_H)
    extrude(amount=-CUT_EXTRUDE_8_DEPTH, mode=Mode.SUBTRACT)

    # 草图12 → 切除-拉伸9 (cut)
    with BuildSketch(Plane.XY.offset(3)):
        with Locations((339.000000001, -0.999999999)):
            Circle(SKETCH_12_R)
        with Locations((353.488887395, -4.882285676)):
            Circle(SKETCH_12_R_2)
        with Locations((347.211188594, -13.552943156)):
            Circle(SKETCH_12_R_2)
        with Locations((352.387569496, 5.76557337)):
            Circle(SKETCH_12_R_2)
    extrude(amount=-CUT_EXTRUDE_9_DEPTH, mode=Mode.SUBTRACT)

    # 草图13 → 切除-拉伸10 (cut)
    with BuildSketch(Plane.XY.offset(3)):
        with Locations((197, -80)):
            Circle(SKETCH_13_R)
        with Locations((197, -60)):
            Circle(SKETCH_13_R)
    extrude(amount=-CUT_EXTRUDE_10_DEPTH, mode=Mode.SUBTRACT)

    # 草图14 → 切除-拉伸11 (cut)
    with BuildSketch(Plane.XY.offset(3)):
        with Locations((183, 41.295936886)):
            Circle(SKETCH_14_R)
    extrude(amount=-CUT_EXTRUDE_11_DEPTH, mode=Mode.SUBTRACT)

    # 草图15 outside → 切除-拉伸12 (cut)
    with BuildSketch(Plane.XY.offset(3)):
        with Locations((112.1135, 190.3025)):
            Rectangle(SKETCH_15_OUTSIDE_W, SKETCH_15_OUTSIDE_H)
        with Locations((368.118175968, -3.499999999)):
            Rectangle(SKETCH_15_OUTSIDE_W_2, SKETCH_15_OUTSIDE_H_2, mode=Mode.SUBTRACT)
    extrude(amount=-CUT_EXTRUDE_12_DEPTH, mode=Mode.SUBTRACT)

    # 草图16 → 凸台-拉伸6 (add)
    with BuildSketch(Plane.XY.offset(3)):
        with BuildLine():
            Line((391.148916275, -20.999999999), (376.967146193, 9.331270381))
            ThreePointArc((376.967146193, 9.331270381), (377.18452175, -5.833604226), (377.217887055, -20.999999999))
            Line((377.217887055, -20.999999999), (391.148916275, -20.999999999))
        make_face()
    extrude(amount=-EXTRUDE_6_DEPTH)

    # 圆角4
    fillet_4_edges = [body_2.edges().sort_by_distance(p)[0] for p in [
        (324.000000001, -20.999999999, 1.5),
        (324.000000001, 14.000000001, 1.5),
    ]]
    fillet(fillet_4_edges, radius=FILLET_4_R)

    # 草图17 → 切除-拉伸13 (cut)
    with BuildSketch(Plane.XY.offset(3)):
        with Locations((376.224335271, -12.689901349)):
            Circle(SKETCH_17_R)
        with Locations((367.567061049, 5.825849765)):
            Circle(SKETCH_17_R)
    extrude(amount=-CUT_EXTRUDE_13_DEPTH, mode=Mode.SUBTRACT)


with BuildPart() as body_3:
    # Split Bodies 1 3 outline → Split Bodies 1 3 (new body)
    with BuildSketch(Plane.XY):
        with BuildLine():
            Line((63, 50.606123087), (63, -120))
            Line((63, -120), (163, -120))
            Line((163, -120), (163, 95.910737705))
            ThreePointArc((163, 95.910737705), (126.802596049, 62.224928854), (78.890834599, 50))
            Line((78.890834599, 50), (69, 50))
            ThreePointArc((69, 50), (65.98473114, 50.15191541), (63, 50.606123087))
        make_face()
        with Locations((78.5, -24)):
            Circle(SPLIT_BODIES_1_3_OUTLINE_R, mode=Mode.SUBTRACT)
        with Locations((127, -110)):
            Circle(SPLIT_BODIES_1_3_OUTLINE_R, mode=Mode.SUBTRACT)
        with Locations((127, -40)):
            Circle(SPLIT_BODIES_1_3_OUTLINE_R, mode=Mode.SUBTRACT)
        with Locations((147.5, -24)):
            Circle(SPLIT_BODIES_1_3_OUTLINE_R, mode=Mode.SUBTRACT)
        with Locations((78.5, 22)):
            Circle(SPLIT_BODIES_1_3_OUTLINE_R, mode=Mode.SUBTRACT)
        with Locations((113, -1)):
            Circle(SPLIT_BODIES_1_3_OUTLINE_R_2, mode=Mode.SUBTRACT)
        with Locations((147.5, 22)):
            Circle(SPLIT_BODIES_1_3_OUTLINE_R, mode=Mode.SUBTRACT)
    extrude(amount=SPLIT_BODIES_1_3_DEPTH)


solid = Compound([part.part, body_2.part, body_3.part])
